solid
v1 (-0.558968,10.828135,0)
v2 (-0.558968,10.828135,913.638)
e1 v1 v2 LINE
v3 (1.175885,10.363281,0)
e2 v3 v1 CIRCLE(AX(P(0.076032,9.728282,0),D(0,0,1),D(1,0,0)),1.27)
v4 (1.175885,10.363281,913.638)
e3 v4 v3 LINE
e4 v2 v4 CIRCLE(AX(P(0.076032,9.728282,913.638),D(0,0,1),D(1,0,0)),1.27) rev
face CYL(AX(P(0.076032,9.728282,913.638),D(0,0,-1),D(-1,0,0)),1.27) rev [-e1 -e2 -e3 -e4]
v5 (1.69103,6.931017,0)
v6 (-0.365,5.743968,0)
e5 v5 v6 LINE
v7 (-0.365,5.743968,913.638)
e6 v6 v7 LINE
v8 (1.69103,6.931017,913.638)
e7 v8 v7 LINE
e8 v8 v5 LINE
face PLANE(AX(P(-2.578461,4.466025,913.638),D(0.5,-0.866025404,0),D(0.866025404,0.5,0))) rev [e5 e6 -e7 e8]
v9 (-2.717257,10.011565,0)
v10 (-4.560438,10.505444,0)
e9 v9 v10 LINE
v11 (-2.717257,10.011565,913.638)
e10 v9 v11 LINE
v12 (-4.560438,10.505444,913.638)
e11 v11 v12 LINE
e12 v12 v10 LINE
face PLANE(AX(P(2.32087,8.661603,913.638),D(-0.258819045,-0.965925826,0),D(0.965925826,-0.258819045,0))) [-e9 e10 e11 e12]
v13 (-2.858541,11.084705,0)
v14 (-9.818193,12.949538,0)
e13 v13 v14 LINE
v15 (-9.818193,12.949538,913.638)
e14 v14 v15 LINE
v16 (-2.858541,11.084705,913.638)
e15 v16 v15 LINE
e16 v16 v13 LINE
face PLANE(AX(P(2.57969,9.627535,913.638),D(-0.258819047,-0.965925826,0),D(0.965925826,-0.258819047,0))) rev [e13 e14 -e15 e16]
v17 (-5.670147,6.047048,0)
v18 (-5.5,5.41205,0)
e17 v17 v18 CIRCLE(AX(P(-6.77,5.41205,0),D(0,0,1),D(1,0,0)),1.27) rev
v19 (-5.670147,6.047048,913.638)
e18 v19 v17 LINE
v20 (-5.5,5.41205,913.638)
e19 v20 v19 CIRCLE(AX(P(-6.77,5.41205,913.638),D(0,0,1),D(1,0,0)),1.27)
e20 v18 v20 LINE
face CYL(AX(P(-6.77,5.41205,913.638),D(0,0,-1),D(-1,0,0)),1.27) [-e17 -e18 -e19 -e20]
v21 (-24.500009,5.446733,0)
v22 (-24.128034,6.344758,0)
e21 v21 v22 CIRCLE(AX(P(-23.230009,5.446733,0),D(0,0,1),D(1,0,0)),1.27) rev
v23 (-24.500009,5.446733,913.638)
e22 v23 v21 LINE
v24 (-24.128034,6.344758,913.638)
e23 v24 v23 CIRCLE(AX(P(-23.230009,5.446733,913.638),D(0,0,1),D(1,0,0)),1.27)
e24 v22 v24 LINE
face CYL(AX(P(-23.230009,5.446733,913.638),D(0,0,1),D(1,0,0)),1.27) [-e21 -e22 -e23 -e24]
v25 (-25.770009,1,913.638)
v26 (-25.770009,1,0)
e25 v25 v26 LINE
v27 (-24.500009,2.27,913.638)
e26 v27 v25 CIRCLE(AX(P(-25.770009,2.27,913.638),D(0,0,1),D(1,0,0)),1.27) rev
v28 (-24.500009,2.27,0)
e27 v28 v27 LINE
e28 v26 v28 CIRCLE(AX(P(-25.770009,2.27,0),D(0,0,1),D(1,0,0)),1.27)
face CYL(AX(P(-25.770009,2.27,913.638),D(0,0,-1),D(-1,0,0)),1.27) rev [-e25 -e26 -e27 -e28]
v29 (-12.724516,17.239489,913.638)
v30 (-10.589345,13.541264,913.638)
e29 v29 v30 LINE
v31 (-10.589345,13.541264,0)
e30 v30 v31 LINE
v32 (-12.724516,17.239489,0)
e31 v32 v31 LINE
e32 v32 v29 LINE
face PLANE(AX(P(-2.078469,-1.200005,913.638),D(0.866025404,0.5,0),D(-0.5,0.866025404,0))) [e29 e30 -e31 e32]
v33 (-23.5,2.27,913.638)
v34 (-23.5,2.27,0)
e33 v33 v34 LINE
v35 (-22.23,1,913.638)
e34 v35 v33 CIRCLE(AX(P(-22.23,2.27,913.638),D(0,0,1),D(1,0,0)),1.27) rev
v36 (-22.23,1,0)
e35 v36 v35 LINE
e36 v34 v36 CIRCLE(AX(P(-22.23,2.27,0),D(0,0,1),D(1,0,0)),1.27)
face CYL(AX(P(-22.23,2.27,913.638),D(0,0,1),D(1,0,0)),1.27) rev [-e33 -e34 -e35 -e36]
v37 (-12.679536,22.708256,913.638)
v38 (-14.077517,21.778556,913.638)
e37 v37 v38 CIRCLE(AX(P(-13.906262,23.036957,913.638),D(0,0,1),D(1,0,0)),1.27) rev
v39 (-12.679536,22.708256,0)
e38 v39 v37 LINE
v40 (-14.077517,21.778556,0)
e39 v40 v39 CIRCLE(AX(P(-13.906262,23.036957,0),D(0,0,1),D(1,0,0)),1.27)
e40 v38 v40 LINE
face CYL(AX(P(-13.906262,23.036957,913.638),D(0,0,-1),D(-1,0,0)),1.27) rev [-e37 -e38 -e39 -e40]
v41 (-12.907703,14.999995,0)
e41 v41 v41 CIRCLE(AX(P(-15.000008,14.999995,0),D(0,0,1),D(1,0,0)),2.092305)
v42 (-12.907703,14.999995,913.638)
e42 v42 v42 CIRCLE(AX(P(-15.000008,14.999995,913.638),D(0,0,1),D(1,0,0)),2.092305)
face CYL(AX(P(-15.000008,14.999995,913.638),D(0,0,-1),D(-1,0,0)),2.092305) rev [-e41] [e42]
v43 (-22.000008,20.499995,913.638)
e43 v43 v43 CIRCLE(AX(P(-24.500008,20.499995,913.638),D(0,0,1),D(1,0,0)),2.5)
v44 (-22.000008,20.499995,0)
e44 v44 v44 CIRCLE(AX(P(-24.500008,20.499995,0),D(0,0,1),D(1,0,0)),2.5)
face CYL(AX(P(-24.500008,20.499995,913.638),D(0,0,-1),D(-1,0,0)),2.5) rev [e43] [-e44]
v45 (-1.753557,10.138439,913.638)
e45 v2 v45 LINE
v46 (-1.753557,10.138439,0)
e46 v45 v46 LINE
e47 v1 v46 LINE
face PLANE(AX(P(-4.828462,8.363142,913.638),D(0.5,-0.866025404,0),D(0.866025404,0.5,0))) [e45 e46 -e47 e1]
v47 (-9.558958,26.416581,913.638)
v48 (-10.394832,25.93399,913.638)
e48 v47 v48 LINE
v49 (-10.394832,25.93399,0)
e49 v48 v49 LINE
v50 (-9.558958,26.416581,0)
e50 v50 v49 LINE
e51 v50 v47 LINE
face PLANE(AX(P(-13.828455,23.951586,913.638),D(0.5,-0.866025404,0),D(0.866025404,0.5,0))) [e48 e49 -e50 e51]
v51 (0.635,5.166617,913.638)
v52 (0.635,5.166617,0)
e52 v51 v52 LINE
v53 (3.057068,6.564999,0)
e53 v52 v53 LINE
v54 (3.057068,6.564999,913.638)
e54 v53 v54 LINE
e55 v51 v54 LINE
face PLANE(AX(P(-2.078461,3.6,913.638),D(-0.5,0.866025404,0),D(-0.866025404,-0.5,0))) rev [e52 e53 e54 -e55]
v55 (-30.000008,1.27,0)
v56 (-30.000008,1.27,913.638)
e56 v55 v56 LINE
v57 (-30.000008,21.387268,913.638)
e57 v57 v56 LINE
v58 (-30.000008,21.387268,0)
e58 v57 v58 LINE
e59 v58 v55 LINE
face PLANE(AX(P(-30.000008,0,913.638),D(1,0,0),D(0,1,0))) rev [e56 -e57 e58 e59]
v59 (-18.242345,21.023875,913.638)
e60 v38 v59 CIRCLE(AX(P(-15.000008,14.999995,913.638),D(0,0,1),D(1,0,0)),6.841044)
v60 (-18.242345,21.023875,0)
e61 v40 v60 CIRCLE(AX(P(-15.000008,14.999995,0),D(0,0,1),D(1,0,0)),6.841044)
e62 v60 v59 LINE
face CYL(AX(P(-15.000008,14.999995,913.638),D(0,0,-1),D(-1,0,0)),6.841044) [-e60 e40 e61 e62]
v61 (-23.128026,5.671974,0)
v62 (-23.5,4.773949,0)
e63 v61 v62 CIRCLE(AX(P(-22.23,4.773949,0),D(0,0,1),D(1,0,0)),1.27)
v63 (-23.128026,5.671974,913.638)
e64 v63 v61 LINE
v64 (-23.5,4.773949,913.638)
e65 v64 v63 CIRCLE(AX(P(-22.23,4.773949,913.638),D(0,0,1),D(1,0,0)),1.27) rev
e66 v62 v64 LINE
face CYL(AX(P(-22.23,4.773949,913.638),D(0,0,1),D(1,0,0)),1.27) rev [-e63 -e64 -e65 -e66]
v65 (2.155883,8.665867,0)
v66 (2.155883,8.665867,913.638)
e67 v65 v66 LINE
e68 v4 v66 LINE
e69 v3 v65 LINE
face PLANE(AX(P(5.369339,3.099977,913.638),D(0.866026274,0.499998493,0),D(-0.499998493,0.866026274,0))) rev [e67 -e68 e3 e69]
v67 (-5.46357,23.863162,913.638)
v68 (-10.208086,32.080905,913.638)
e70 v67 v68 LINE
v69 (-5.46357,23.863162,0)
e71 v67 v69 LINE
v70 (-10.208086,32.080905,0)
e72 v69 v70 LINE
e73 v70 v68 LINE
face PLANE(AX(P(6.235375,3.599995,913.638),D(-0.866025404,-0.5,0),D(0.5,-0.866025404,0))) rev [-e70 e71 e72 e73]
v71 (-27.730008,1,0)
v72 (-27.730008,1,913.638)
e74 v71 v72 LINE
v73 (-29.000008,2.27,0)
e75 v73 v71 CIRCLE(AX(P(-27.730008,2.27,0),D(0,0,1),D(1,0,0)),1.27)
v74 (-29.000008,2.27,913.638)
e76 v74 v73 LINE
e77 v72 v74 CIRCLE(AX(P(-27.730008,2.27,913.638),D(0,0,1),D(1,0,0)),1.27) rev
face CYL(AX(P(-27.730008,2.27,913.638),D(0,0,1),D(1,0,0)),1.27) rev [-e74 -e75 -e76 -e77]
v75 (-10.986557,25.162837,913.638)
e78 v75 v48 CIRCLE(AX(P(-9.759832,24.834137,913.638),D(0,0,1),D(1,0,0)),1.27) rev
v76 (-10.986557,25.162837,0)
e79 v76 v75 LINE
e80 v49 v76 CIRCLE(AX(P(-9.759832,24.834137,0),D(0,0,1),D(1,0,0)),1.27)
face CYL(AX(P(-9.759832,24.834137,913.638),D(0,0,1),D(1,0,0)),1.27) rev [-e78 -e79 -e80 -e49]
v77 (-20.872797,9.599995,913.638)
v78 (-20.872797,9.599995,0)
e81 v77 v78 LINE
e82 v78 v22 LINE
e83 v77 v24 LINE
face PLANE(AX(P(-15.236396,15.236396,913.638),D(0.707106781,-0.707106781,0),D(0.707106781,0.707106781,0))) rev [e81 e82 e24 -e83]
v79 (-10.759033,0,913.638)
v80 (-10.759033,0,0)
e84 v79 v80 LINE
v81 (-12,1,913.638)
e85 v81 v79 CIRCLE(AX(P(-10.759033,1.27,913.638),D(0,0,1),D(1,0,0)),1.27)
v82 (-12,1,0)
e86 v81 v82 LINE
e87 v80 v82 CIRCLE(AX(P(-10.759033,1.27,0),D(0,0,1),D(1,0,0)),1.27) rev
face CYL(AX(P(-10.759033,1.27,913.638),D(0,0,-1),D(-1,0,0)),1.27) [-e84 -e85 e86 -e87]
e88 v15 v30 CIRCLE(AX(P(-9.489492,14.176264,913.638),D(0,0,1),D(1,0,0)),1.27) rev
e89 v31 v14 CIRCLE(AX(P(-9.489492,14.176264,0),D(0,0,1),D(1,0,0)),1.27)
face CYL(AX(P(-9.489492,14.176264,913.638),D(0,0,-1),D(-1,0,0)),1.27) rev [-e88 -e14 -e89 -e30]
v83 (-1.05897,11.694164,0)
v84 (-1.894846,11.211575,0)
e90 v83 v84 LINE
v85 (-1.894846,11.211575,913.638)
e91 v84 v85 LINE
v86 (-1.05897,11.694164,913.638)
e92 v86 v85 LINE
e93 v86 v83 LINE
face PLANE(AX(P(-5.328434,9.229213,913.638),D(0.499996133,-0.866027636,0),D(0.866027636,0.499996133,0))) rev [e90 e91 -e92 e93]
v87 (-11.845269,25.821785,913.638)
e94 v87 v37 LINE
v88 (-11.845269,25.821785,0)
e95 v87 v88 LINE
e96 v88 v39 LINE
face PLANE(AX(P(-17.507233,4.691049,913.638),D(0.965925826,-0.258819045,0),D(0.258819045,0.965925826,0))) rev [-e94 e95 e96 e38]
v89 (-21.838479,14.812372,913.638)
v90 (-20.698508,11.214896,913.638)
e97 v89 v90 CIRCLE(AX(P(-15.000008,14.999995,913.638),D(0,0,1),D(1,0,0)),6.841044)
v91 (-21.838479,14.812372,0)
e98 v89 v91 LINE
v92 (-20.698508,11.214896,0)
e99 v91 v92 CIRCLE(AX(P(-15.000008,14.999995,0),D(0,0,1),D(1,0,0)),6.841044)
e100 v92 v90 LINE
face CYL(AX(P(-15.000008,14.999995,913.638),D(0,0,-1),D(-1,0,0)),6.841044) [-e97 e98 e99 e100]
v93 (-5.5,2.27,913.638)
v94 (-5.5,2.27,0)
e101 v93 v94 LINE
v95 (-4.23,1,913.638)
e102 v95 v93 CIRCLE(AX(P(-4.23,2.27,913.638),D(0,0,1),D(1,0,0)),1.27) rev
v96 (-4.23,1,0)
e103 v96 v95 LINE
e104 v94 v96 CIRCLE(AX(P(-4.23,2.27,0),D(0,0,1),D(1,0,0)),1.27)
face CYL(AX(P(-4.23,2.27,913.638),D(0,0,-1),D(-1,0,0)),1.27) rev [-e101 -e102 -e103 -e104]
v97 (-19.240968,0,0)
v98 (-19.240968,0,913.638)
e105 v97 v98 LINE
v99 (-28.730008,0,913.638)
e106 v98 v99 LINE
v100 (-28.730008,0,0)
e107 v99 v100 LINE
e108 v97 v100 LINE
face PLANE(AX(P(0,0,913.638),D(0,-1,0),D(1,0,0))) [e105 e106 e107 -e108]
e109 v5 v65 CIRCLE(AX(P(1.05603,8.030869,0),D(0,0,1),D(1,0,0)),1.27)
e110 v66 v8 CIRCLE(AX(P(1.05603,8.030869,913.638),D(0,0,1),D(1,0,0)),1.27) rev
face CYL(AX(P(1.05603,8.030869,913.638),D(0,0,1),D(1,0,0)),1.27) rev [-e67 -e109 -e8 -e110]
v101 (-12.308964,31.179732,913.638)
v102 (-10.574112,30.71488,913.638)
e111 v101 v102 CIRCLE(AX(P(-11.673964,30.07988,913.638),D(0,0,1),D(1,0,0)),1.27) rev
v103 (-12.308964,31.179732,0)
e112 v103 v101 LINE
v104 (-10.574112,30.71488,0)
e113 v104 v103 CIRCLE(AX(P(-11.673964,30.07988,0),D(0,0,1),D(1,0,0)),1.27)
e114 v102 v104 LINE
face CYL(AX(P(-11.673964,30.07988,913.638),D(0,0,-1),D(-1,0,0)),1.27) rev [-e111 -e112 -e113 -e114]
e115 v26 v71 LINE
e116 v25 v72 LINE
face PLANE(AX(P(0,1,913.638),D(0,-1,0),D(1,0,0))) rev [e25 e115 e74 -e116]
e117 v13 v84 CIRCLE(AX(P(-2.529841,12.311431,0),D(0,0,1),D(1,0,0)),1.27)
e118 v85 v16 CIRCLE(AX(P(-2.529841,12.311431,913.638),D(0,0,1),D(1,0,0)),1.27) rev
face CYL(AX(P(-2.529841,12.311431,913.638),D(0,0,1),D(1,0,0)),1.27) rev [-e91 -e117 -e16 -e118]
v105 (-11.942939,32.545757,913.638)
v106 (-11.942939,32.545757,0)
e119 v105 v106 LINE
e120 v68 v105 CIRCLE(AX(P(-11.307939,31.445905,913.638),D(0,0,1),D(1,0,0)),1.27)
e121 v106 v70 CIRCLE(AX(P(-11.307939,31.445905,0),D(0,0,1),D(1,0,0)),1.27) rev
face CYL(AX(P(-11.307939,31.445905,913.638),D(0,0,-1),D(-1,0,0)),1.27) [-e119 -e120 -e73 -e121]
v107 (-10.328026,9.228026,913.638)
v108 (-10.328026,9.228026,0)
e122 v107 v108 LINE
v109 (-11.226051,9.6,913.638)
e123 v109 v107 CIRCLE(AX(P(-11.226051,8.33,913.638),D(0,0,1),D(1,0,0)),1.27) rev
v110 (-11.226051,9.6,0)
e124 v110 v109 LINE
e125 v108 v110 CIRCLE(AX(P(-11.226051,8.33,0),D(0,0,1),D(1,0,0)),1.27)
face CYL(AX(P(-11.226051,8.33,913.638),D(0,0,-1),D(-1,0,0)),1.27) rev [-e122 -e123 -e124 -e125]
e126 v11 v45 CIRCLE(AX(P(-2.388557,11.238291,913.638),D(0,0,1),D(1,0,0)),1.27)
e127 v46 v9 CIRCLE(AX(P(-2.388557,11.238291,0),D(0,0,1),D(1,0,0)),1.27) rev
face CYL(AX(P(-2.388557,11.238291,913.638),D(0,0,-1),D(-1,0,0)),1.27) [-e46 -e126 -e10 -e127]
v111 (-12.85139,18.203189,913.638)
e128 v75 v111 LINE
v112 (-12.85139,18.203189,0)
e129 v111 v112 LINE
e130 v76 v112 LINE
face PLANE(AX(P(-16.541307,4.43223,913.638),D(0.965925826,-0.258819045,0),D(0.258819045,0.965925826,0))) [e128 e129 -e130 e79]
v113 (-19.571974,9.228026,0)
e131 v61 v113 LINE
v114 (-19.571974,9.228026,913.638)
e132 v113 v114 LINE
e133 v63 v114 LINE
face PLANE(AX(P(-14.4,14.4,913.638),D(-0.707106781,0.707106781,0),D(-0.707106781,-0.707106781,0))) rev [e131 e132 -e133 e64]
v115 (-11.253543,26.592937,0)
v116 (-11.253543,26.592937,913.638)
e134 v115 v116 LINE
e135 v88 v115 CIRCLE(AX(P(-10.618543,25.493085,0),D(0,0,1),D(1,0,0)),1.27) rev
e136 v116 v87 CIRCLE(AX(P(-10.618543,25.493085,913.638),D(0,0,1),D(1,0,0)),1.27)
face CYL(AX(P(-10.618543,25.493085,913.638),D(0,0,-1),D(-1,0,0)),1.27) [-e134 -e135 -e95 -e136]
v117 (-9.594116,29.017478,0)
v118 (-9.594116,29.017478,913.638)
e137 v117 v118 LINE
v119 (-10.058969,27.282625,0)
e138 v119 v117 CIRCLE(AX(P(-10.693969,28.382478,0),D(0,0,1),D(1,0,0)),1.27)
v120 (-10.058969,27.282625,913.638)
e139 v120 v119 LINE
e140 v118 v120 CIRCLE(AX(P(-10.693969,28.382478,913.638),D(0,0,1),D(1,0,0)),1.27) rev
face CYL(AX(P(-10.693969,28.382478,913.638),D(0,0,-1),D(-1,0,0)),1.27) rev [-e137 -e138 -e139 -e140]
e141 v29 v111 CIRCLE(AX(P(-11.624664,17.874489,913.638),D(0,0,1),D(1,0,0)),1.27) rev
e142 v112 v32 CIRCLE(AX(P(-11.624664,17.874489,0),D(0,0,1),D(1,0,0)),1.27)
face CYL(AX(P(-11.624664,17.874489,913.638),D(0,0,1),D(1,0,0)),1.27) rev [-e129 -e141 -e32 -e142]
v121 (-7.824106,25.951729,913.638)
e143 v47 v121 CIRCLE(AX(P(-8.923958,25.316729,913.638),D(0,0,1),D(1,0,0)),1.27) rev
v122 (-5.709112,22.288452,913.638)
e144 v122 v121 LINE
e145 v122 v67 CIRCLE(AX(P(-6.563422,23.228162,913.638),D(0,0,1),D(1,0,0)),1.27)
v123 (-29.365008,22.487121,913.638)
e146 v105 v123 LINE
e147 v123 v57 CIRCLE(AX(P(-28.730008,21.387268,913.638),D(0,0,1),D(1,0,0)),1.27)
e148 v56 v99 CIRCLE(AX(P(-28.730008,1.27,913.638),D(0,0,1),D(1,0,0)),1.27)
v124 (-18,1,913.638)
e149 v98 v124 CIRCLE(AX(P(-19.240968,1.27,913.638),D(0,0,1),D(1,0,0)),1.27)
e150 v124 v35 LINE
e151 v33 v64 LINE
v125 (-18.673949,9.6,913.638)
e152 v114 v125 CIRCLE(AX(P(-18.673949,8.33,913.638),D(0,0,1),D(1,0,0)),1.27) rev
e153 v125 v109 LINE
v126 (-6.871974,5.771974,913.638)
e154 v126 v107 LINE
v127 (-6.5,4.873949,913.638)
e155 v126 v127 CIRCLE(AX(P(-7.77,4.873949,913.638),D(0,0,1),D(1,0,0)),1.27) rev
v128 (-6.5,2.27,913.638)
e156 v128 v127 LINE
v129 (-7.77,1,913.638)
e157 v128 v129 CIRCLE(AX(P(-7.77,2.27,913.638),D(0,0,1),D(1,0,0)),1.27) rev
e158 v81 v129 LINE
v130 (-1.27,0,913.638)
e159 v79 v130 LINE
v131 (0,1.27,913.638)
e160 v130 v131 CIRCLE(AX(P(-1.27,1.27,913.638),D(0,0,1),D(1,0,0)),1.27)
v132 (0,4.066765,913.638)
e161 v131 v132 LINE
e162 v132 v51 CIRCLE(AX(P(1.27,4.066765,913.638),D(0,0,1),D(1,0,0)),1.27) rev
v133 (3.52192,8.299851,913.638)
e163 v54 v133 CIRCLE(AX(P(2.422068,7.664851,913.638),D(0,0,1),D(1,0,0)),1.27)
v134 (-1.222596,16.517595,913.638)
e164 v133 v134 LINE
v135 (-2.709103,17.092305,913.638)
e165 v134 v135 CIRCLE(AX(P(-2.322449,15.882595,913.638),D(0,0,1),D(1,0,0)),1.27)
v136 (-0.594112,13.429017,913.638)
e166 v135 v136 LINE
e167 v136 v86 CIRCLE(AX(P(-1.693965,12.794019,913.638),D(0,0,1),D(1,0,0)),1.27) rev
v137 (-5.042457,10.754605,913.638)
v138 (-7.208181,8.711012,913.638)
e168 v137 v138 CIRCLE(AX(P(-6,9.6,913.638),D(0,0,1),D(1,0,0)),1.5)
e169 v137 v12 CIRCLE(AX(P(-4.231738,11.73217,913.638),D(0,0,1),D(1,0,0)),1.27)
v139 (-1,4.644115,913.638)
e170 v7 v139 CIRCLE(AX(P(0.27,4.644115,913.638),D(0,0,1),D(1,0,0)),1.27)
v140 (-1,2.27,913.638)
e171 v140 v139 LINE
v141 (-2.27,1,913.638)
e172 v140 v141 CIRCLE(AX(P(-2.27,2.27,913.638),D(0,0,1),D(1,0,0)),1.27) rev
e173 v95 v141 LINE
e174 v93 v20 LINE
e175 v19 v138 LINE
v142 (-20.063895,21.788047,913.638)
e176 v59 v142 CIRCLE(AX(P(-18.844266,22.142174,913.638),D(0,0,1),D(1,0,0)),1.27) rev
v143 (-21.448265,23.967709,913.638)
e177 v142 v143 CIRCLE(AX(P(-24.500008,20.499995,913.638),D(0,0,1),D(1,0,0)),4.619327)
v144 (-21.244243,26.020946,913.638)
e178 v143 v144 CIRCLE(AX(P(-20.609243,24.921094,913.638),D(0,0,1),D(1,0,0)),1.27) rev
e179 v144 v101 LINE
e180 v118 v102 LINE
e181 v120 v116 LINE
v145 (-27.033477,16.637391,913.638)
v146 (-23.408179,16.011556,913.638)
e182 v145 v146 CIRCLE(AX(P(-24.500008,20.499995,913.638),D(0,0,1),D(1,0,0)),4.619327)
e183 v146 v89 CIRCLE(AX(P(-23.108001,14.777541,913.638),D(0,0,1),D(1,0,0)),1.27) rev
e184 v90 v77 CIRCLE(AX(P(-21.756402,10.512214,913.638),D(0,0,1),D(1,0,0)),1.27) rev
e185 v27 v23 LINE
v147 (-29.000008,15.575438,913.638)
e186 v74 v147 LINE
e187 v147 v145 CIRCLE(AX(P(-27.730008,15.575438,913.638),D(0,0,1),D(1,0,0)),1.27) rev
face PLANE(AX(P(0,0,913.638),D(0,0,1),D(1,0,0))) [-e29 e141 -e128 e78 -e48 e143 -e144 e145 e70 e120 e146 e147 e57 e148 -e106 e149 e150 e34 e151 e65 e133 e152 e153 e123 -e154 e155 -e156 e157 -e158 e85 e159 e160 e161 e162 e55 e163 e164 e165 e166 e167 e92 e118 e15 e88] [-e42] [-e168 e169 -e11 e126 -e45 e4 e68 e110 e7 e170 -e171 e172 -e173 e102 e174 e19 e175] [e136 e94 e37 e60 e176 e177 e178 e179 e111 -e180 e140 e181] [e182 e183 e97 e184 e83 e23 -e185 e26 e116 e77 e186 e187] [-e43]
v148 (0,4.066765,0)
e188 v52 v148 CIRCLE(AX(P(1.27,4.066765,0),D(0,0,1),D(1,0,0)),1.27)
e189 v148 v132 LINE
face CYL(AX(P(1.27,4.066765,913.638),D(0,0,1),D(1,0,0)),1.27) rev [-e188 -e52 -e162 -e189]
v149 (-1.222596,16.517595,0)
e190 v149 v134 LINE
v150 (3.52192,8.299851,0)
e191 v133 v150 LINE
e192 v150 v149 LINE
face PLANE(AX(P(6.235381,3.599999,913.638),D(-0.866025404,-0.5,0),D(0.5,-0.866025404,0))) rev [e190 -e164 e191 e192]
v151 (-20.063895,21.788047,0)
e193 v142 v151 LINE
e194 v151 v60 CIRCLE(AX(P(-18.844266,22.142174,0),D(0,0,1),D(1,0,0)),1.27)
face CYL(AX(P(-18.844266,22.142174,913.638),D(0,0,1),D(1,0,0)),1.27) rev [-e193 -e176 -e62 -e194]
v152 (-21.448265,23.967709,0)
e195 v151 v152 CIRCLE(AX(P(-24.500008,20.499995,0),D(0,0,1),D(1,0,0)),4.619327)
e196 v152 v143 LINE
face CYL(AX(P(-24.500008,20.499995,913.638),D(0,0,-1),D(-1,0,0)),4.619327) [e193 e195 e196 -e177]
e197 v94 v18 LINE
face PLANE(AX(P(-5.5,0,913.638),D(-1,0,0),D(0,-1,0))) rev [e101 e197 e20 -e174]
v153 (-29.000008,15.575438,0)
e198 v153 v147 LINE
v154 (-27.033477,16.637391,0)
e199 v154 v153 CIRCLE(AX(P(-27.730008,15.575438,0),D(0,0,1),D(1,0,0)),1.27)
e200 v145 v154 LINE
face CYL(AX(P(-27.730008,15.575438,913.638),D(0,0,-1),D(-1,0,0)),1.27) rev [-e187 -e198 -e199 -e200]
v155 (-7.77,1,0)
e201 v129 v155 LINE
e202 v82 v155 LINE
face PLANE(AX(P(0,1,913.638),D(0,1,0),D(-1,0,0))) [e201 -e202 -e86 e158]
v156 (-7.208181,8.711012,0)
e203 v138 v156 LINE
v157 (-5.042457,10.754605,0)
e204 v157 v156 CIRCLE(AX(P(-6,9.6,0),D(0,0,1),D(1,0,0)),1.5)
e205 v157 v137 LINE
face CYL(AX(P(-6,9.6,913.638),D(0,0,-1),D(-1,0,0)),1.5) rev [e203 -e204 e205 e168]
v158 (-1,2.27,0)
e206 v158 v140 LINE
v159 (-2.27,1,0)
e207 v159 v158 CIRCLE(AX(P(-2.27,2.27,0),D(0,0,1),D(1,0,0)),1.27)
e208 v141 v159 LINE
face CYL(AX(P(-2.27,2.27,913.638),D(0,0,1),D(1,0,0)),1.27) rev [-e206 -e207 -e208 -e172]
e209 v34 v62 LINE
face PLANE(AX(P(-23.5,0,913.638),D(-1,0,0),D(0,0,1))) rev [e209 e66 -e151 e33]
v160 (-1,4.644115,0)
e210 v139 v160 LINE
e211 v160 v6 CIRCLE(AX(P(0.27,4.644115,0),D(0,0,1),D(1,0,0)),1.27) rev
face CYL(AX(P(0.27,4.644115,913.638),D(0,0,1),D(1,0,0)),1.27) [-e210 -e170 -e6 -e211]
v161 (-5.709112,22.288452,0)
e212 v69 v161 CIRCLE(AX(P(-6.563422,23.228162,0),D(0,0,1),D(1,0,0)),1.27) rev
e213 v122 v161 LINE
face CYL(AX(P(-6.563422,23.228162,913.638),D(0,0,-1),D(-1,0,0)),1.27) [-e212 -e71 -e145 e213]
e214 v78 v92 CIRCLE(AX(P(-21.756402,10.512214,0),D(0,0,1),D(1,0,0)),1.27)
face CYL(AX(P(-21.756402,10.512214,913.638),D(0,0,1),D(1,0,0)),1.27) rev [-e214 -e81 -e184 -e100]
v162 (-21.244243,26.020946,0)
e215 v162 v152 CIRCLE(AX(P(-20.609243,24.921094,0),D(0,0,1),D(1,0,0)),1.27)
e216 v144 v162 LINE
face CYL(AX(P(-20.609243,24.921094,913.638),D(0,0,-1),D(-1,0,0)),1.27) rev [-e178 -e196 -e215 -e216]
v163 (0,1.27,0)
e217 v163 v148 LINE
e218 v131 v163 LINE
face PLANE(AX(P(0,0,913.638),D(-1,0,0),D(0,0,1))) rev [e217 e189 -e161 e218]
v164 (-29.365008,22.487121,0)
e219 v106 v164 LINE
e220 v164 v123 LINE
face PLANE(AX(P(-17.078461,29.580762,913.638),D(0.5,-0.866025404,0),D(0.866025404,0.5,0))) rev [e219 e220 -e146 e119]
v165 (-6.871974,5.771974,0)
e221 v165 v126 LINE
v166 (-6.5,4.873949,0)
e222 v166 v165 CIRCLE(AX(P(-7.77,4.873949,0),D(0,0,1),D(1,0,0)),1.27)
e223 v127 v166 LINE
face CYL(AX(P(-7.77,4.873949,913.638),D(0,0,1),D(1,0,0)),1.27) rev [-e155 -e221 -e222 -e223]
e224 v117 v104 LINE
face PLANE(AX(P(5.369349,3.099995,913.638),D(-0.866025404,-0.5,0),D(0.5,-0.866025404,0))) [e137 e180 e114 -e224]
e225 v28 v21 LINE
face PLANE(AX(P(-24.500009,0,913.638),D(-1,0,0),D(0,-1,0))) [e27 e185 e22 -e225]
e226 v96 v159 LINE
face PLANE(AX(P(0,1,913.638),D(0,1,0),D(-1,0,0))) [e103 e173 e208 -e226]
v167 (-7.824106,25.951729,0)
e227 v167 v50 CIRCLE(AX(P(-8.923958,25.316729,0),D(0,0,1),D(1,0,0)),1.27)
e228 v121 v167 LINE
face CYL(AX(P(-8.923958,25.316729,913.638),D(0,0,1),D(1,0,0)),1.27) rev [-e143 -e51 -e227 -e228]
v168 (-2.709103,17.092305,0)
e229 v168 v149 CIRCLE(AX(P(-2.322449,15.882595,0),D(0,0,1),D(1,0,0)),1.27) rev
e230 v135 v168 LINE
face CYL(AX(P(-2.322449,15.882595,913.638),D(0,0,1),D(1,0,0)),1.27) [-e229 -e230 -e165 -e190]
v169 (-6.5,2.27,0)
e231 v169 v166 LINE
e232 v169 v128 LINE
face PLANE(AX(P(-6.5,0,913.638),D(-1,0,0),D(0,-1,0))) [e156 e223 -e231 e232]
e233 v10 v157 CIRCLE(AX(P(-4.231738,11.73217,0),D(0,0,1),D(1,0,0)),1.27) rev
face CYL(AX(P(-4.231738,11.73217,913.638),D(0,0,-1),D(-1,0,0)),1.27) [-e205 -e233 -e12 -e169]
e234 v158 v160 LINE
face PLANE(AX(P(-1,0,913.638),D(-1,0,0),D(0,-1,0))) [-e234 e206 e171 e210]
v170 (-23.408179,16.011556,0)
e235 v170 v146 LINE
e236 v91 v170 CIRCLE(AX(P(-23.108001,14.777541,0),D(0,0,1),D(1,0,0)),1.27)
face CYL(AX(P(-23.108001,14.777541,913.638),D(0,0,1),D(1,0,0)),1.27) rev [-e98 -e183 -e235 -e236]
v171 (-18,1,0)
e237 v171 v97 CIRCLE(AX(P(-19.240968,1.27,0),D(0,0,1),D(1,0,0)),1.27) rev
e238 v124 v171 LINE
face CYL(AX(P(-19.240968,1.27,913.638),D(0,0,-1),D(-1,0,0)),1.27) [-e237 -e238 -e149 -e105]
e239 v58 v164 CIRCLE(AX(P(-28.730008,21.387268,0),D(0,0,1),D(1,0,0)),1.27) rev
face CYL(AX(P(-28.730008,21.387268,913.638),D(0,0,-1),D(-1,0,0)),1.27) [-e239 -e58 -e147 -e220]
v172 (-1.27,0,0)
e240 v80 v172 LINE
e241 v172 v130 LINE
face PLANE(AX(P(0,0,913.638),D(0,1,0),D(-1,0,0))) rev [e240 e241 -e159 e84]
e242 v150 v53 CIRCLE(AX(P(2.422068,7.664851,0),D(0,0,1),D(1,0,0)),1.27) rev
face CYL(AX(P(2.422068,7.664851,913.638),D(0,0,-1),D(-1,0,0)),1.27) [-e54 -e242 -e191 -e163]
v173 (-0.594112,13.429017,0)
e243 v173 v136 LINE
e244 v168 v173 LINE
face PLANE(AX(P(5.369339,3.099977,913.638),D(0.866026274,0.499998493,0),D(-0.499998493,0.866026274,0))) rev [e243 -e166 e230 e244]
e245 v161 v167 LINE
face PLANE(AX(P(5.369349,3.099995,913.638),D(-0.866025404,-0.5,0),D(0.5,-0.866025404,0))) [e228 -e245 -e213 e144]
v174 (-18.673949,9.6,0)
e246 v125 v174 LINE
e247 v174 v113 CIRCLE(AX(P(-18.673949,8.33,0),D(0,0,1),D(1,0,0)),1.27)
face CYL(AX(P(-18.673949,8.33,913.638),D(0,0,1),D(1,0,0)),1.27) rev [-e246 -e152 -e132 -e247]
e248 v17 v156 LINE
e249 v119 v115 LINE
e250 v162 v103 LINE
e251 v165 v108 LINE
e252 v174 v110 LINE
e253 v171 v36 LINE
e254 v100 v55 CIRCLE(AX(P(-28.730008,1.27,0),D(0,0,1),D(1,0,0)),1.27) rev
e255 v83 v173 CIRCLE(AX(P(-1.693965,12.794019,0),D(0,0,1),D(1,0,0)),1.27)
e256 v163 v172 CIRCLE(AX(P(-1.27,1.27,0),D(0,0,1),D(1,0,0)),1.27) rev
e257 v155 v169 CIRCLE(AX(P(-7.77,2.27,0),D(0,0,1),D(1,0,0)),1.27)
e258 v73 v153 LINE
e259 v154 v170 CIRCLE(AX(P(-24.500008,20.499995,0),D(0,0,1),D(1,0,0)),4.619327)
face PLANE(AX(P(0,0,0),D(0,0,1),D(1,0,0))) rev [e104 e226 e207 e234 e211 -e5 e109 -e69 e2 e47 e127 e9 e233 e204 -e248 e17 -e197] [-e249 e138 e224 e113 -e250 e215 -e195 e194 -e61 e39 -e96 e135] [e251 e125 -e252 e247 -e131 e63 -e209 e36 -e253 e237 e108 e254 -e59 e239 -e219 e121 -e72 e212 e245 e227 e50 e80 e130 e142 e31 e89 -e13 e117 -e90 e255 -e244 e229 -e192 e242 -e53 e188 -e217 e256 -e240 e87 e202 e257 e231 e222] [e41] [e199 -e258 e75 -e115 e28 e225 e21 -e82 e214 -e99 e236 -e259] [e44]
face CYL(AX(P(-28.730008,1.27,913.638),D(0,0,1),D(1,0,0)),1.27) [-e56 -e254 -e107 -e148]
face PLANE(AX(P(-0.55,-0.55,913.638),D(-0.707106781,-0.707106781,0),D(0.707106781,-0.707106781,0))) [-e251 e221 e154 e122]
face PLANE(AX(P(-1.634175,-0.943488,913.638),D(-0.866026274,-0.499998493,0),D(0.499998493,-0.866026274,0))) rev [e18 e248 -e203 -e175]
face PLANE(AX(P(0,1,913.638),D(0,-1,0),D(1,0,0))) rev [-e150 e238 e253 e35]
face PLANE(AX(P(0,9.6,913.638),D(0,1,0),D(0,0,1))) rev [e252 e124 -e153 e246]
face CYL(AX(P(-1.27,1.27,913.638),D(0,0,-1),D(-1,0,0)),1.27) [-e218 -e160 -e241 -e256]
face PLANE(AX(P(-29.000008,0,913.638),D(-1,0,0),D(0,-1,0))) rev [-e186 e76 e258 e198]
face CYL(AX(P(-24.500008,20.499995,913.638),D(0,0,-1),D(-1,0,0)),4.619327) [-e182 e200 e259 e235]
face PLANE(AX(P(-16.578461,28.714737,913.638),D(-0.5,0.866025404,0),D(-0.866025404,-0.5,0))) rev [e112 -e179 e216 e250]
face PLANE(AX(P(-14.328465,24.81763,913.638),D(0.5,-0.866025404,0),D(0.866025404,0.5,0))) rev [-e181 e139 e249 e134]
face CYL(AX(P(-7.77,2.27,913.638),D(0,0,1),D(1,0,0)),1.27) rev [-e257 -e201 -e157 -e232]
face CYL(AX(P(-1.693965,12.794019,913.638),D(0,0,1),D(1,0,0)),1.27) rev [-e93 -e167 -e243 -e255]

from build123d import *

# Parameters (mm, degrees)
SKETCH1_R           = 2.092304845
BOSS_EXTRUDE1_DEPTH = 913.638
FILLET1_R           = 1.27
FILLET2_R           = 1.27
FILLET3_R           = 1.27
FILLET4_R           = 1.27
FILLET5_R           = 1.27
FILLET6_R           = 1.27
FILLET7_R           = 1.27
FILLET8_R           = 1.27
FILLET9_R           = 1.27
FILLET10_R          = 1.27
FILLET11_R          = 1.27
FILLET12_R          = 1.27


with BuildPart() as part:
    # Sketch1 → Boss-Extrude1 (new body)
    with BuildSketch(Plane.XY):
        Polygon((-5.709111752, 22.288452484), (-4.843086348, 22.788452484), (-10.843086348, 33.180757329), (-30.000008327, 22.120503268), (-30.000008327, 0), (-18.0000002, 0), (-18.0000002, 1), (-23.500000006, 1), (-23.500000006, 5.300000062), (-19.200000068, 9.6), (-10.7, 9.6), (-6.5, 5.4), (-6.5, 1), (-11.999999876, 1), (-11.999999876, 0), (0, 0), (0, 4.8), (4.156920206, 7.199999), (-1.843078924, 17.592302339), (-2.709103466, 17.092304845), (0.040888209, 12.329160408), (-2.350417658, 10.948553557), (-10.326319052, 13.085689909), (-12.987541577, 17.695062532), (-10.850405232, 25.670963952), (-8.459105552, 27.051581466), align=None)
        with BuildLine():
            Line((-24.500008532, 1), (-29.00000835, 1))
            Line((-29.00000835, 1), (-29.00000835, 19.456837393))
            ThreePointArc((-29.00000835, 19.456837393), (-26.689110252, 16.43231636), (-22.891878185, 16.169626182))
            ThreePointArc((-22.891878185, 16.169626182), (-22.194595414, 16.497090044), (-21.561428455, 16.935878658))
            ThreePointArc((-21.561428455, 16.935878658), (-21.66355866, 13.451778233), (-20.035811579, 10.369599493))
            Line((-20.035811579, 10.369599493), (-20.872797194, 9.599995438))
            Line((-20.872797194, 9.599995438), (-24.500008532, 5.9727841))
            Line((-24.500008532, 5.9727841), (-24.500008532, 1))
        make_face(mode=Mode.SUBTRACT)
        with Locations((-15.000008327, 14.999995205)):
            Circle(SKETCH1_R, mode=Mode.SUBTRACT)
        with BuildLine():
            Line((-2.209115566, 9.875409102), (0.540892748, 11.463127143))
            Line((0.540892748, 11.463127143), (2.790879962, 7.566015836))
            Line((2.790879962, 7.566015836), (-1, 5.377350269))
            Line((-1, 5.377350269), (-1, 1))
            Line((-1, 1), (-5.5, 1))
            Line((-5.5, 1), (-5.5, 5.752344548))
            Line((-5.5, 5.752344548), (-7.208180578, 8.711011985))
            ThreePointArc((-7.208180578, 8.711011985), (-6.939845297, 10.769055524), (-4.872208764, 10.588982774))
            Line((-4.872208764, 10.588982774), (-2.209115566, 9.875409102))
        make_face(mode=Mode.SUBTRACT)
        with BuildLine():
            ThreePointArc((-25.041331703, 18.059304934), (-26.0647274, 22.449778327), (-22.000008327, 20.499995205))
            ThreePointArc((-22.000008327, 20.499995205), (-22.935289253, 18.550212084), (-25.041331703, 18.059304934))
        make_face(mode=Mode.SUBTRACT)
        with BuildLine():
            Line((-11.209111752, 31.814731926), (-8.959116197, 27.917625308))
            Line((-8.959116197, 27.917625308), (-11.709116867, 26.329911808))
            Line((-11.709116867, 26.329911808), (-12.992600022, 21.539887463))
            ThreePointArc((-12.992600022, 21.539887463), (-16.72657734, 21.619575123), (-19.945942173, 19.726264054))
            ThreePointArc((-19.945942173, 19.726264054), (-20.570023631, 22.927627533), (-23.153409445, 24.918688437))
            Line((-23.153409445, 24.918688437), (-11.209111752, 31.814731926))
        make_face(mode=Mode.SUBTRACT)
    extrude(amount=BOSS_EXTRUDE1_DEPTH)

    # Fillet1
    fillet1_edges = [part.edges().sort_by_distance(p)[0] for p in [
        (-11.709116867, 26.329911808, 456.819),
        (-11.209111752, 31.814731926, 456.819),
        (4.156920206, 7.199999, 456.819),
        (0, 0, 456.819),
        (-10.7, 9.6, 456.819),
        (-19.200000068, 9.6, 456.819),
        (-30.000008327, 0, 456.819),
        (-30.000008327, 22.120503268, 456.819),
        (-2.209115566, 9.875409102, 456.819),
    ]]
    fillet(fillet1_edges, radius=FILLET1_R)

    # Fillet2
    # the kernel refuses this fillet: 1.27 mm, written as the material it adds along each edge
    with BuildSketch(Plane(origin=(-6.5, 5.4, 0), x_dir=(-0.7071067811865475, 0.7071067811865475, 0), z_dir=(0, 0, 1))) as fillet2_piece_1:
        with BuildLine():
            CenterArc((FILLET2_R * 0.414213562373, FILLET2_R), FILLET2_R, 225, 45)
            Line((-FILLET2_R * 0.292893218813, FILLET2_R * 0.292893218813), (-FILLET2_R * 0.307035354437, FILLET2_R * 0.27875108319))
            Line((-FILLET2_R * 0.307035354437, FILLET2_R * 0.27875108319), (-FILLET2_R * 0.00828427124746, -FILLET2_R * 0.02))
            Line((-FILLET2_R * 0.00828427124746, -FILLET2_R * 0.02), (FILLET2_R * 0.414213562373, -FILLET2_R * 0.02))
            Line((FILLET2_R * 0.414213562373, -FILLET2_R * 0.02), (FILLET2_R * 0.414213562373, 0))
        make_face()
    extrude(amount=913.638)
    # the kernel refuses this fillet: 1.27 mm, written as the material it adds along each edge
    with BuildSketch(Plane(origin=(-20.035811579, 10.369599493, 0), x_dir=(-0.736116223784905, -0.6768551581251718, 0), z_dir=(0, 0, 1))) as fillet2_2_piece_1:
        with BuildLine():
            CenterArc((1.170024806, -1.269571301), FILLET2_R, 91.488758863, 79.506059356)
            Line((-0.084321413, -1.070786087), (-0.109408338, -1.066810383))
            ThreePointArc((-0.109408338, -1.066810383), (-0.046434543, -0.535056491), (-0.0254, 0))
            Line((-0.0254, 0), (0, 0.0254))
            ThreePointArc((0, 0.0254), (0.568514582, 0.0254), (1.136369252, 0.025391426))
            Line((1.136369252, 0.025391426), (1.137029165, 0))
        make_face()
    extrude(amount=913.638)
    # the kernel refuses this fillet: 1.27 mm, written as the material it takes off along each edge
    with BuildSketch(Plane(origin=(-24.500008532, 5.9727841, -1.315128061), x_dir=(0, -1, 0), z_dir=(0, 0, 1))) as fillet2_3_piece_1:
        with BuildLine():
            CenterArc((FILLET2_R * 0.414213562373, FILLET2_R), FILLET2_R, 225, 45)
            Line((-FILLET2_R * 0.292893218813, FILLET2_R * 0.292893218813), (-FILLET2_R * 0.307035354437, FILLET2_R * 0.27875108319))
            Line((-FILLET2_R * 0.307035354437, FILLET2_R * 0.27875108319), (-FILLET2_R * 0.00828427124746, -FILLET2_R * 0.02))
            Line((-FILLET2_R * 0.00828427124746, -FILLET2_R * 0.02), (FILLET2_R * 0.414213562373, -FILLET2_R * 0.02))
            Line((FILLET2_R * 0.414213562373, -FILLET2_R * 0.02), (FILLET2_R * 0.414213562373, 0))
        make_face()
    extrude(amount=916.268256121, mode=Mode.SUBTRACT)

    # Fillet3
    fillet3_edges = [part.edges().sort_by_distance(p)[0] for p in [
        (-23.500000006, 5.300000062, 456.819),
        (-10.850405232, 25.670963952, 456.819),
        (-12.987541577, 17.695062532, 456.819),
    ]]
    fillet(fillet3_edges, radius=FILLET3_R)

    # Fillet4
    fillet4_edges = [part.edges().sort_by_distance(p)[0] for p in [
        (-10.326319052, 13.085689909, 456.819),
        (-2.350417658, 10.948553557, 456.819),
    ]]
    fillet(fillet4_edges, radius=FILLET4_R)

    # Fillet5
    fillet5_edges = [part.edges().sort_by_distance(p)[0] for p in [
        (2.790879962, 7.566015836, 456.819),
        (0.540892748, 11.463127143, 456.819),
        (-1, 5.377350269, 456.819),
        (-4.872208764, 10.588982774, 456.819),
    ]]
    fillet(fillet5_edges, radius=FILLET5_R)

    # Fillet6
    fillet6_edges = [part.edges().sort_by_distance(p)[0] for p in [
        (-29.00000835, 1, 456.819),
        (-24.500008532, 1, 456.819),
        (-6.5, 1, 456.819),
        (-23.500000006, 1, 456.819),
        (-5.5, 5.752344548, 456.819),
        (-5.5, 1, 456.819),
        (-1, 1, 456.819),
    ]]
    fillet(fillet6_edges, radius=FILLET6_R)

    # Fillet7
    fillet7_edges = [part.edges().sort_by_distance(p)[0] for p in [
        (-8.959116197, 27.917625308, 456.819),
        (-19.945942173, 19.726264054, 456.819),
        (-12.992600022, 21.539887463, 456.819),
        (-21.561428455, 16.935878658, 456.819),
        (0.040888209, 12.329160408, 456.819),
        (-8.459105552, 27.051581466, 456.819),
    ]]
    fillet(fillet7_edges, radius=FILLET7_R)

    # Fillet8
    fillet8_edges = [part.edges().sort_by_distance(p)[0] for p in [
        (-23.153409445, 24.918688437, 456.819),
        (0, 4.8, 456.819),
    ]]
    fillet(fillet8_edges, radius=FILLET8_R)

    # Fillet9
    fillet9_edges = [part.edges().sort_by_distance(p)[0] for p in [
        (-29.00000835, 19.456837393, 456.819),
    ]]
    fillet(fillet9_edges, radius=FILLET9_R)

    # Fillet10
    # the kernel refuses this fillet: 1.27 mm, written as the material it takes off along each edge
    with BuildSketch(Plane(origin=(-11.999999876, 0, -3.102418412), x_dir=(1, 0, 0), z_dir=(0, 0, 1))) as fillet10_piece_1:
        with BuildLine():
            CenterArc((1.240967365, 1.27), FILLET10_R, 192.274670215, 77.725329785)
            Line((0, 1), (-0.024819347, 0.9946))
            ThreePointArc((-0.024819347, 0.9946), (-0.0254, 0.5), (-0.0254, 0))
            Line((-0.0254, 0), (0, -0.0254))
            Line((0, -0.0254), (1.240967365, -0.0254))
            Line((1.240967365, -0.0254), (1.240967365, 0))
        make_face()
    extrude(amount=919.842836823, mode=Mode.SUBTRACT)
    with BuildSketch(Plane(origin=(-18.0000002, 0, -3.102418412), x_dir=(-3.741007503773801e-12, 1.0, 0), z_dir=(0, 0, 1))) as fillet10_piece_2:
        with BuildLine():
            CenterArc((1.27, 1.240967365), FILLET10_R, 180, 77.725329785)
            Line((0, 1.240967365), (-0.0254, 1.240967365))
            Line((-0.0254, 1.240967365), (-0.0254, 0))
            Line((-0.0254, 0), (0, -0.0254))
            ThreePointArc((0, -0.0254), (0.5, -0.0254), (0.9946, -0.024819347))
            Line((0.9946, -0.024819347), (1, 0))
        make_face()
    extrude(amount=919.842836823, mode=Mode.SUBTRACT)

    # Fillet11
    # the kernel refuses this fillet: 1.27 mm, written as the material it takes off along each edge
    with BuildSketch(Plane(origin=(-4.843086348, 22.788452484, -3.102418412), x_dir=(-0.8660254037863125, -0.49999999999675426, 0), z_dir=(0, 0, 1))) as fillet11_piece_1:
        with BuildLine():
            CenterArc((1.27, -1.240967365), FILLET11_R, 102.274670215, 77.725329785)
            Line((0, -1.240967365), (-0.0254, -1.240967365))
            Line((-0.0254, -1.240967365), (-0.0254, 0))
            Line((-0.0254, 0), (0, 0.0254))
            ThreePointArc((0, 0.0254), (0.5, 0.0254), (0.9946, 0.024819347))
            Line((0.9946, 0.024819347), (1, 0))
        make_face()
    extrude(amount=919.842836823, mode=Mode.SUBTRACT)
    with BuildSketch(Plane(origin=(-1.843078924, 17.592302339, -3.102412974), x_dir=(0.499999999999999, -0.8660254037844393, 0), z_dir=(0, 0, 1))) as fillet11_piece_2:
        with BuildLine():
            CenterArc((1.24096519, -1.27), FILLET11_R, 90, 77.725237445)
            Line((-1.74e-06, -0.999998), (-0.024821078, -0.99459796))
            ThreePointArc((-0.024821078, -0.99459796), (-0.02540087, -0.499998956), (-0.0254, 4.4e-08))
            Line((-0.0254, 4.4e-08), (0, 0.0254))
            Line((0, 0.0254), (1.24096519, 0.0254))
            Line((1.24096519, 0.0254), (1.24096519, 0))
        make_face()
    extrude(amount=919.842825949, mode=Mode.SUBTRACT)

    # Fillet12
    fillet12_edges = [part.edges().sort_by_distance(p)[0] for p in [
        (-10.843086348, 33.180757329, 456.819),
    ]]
    fillet(fillet12_edges, radius=FILLET12_R)


solid = part.part
